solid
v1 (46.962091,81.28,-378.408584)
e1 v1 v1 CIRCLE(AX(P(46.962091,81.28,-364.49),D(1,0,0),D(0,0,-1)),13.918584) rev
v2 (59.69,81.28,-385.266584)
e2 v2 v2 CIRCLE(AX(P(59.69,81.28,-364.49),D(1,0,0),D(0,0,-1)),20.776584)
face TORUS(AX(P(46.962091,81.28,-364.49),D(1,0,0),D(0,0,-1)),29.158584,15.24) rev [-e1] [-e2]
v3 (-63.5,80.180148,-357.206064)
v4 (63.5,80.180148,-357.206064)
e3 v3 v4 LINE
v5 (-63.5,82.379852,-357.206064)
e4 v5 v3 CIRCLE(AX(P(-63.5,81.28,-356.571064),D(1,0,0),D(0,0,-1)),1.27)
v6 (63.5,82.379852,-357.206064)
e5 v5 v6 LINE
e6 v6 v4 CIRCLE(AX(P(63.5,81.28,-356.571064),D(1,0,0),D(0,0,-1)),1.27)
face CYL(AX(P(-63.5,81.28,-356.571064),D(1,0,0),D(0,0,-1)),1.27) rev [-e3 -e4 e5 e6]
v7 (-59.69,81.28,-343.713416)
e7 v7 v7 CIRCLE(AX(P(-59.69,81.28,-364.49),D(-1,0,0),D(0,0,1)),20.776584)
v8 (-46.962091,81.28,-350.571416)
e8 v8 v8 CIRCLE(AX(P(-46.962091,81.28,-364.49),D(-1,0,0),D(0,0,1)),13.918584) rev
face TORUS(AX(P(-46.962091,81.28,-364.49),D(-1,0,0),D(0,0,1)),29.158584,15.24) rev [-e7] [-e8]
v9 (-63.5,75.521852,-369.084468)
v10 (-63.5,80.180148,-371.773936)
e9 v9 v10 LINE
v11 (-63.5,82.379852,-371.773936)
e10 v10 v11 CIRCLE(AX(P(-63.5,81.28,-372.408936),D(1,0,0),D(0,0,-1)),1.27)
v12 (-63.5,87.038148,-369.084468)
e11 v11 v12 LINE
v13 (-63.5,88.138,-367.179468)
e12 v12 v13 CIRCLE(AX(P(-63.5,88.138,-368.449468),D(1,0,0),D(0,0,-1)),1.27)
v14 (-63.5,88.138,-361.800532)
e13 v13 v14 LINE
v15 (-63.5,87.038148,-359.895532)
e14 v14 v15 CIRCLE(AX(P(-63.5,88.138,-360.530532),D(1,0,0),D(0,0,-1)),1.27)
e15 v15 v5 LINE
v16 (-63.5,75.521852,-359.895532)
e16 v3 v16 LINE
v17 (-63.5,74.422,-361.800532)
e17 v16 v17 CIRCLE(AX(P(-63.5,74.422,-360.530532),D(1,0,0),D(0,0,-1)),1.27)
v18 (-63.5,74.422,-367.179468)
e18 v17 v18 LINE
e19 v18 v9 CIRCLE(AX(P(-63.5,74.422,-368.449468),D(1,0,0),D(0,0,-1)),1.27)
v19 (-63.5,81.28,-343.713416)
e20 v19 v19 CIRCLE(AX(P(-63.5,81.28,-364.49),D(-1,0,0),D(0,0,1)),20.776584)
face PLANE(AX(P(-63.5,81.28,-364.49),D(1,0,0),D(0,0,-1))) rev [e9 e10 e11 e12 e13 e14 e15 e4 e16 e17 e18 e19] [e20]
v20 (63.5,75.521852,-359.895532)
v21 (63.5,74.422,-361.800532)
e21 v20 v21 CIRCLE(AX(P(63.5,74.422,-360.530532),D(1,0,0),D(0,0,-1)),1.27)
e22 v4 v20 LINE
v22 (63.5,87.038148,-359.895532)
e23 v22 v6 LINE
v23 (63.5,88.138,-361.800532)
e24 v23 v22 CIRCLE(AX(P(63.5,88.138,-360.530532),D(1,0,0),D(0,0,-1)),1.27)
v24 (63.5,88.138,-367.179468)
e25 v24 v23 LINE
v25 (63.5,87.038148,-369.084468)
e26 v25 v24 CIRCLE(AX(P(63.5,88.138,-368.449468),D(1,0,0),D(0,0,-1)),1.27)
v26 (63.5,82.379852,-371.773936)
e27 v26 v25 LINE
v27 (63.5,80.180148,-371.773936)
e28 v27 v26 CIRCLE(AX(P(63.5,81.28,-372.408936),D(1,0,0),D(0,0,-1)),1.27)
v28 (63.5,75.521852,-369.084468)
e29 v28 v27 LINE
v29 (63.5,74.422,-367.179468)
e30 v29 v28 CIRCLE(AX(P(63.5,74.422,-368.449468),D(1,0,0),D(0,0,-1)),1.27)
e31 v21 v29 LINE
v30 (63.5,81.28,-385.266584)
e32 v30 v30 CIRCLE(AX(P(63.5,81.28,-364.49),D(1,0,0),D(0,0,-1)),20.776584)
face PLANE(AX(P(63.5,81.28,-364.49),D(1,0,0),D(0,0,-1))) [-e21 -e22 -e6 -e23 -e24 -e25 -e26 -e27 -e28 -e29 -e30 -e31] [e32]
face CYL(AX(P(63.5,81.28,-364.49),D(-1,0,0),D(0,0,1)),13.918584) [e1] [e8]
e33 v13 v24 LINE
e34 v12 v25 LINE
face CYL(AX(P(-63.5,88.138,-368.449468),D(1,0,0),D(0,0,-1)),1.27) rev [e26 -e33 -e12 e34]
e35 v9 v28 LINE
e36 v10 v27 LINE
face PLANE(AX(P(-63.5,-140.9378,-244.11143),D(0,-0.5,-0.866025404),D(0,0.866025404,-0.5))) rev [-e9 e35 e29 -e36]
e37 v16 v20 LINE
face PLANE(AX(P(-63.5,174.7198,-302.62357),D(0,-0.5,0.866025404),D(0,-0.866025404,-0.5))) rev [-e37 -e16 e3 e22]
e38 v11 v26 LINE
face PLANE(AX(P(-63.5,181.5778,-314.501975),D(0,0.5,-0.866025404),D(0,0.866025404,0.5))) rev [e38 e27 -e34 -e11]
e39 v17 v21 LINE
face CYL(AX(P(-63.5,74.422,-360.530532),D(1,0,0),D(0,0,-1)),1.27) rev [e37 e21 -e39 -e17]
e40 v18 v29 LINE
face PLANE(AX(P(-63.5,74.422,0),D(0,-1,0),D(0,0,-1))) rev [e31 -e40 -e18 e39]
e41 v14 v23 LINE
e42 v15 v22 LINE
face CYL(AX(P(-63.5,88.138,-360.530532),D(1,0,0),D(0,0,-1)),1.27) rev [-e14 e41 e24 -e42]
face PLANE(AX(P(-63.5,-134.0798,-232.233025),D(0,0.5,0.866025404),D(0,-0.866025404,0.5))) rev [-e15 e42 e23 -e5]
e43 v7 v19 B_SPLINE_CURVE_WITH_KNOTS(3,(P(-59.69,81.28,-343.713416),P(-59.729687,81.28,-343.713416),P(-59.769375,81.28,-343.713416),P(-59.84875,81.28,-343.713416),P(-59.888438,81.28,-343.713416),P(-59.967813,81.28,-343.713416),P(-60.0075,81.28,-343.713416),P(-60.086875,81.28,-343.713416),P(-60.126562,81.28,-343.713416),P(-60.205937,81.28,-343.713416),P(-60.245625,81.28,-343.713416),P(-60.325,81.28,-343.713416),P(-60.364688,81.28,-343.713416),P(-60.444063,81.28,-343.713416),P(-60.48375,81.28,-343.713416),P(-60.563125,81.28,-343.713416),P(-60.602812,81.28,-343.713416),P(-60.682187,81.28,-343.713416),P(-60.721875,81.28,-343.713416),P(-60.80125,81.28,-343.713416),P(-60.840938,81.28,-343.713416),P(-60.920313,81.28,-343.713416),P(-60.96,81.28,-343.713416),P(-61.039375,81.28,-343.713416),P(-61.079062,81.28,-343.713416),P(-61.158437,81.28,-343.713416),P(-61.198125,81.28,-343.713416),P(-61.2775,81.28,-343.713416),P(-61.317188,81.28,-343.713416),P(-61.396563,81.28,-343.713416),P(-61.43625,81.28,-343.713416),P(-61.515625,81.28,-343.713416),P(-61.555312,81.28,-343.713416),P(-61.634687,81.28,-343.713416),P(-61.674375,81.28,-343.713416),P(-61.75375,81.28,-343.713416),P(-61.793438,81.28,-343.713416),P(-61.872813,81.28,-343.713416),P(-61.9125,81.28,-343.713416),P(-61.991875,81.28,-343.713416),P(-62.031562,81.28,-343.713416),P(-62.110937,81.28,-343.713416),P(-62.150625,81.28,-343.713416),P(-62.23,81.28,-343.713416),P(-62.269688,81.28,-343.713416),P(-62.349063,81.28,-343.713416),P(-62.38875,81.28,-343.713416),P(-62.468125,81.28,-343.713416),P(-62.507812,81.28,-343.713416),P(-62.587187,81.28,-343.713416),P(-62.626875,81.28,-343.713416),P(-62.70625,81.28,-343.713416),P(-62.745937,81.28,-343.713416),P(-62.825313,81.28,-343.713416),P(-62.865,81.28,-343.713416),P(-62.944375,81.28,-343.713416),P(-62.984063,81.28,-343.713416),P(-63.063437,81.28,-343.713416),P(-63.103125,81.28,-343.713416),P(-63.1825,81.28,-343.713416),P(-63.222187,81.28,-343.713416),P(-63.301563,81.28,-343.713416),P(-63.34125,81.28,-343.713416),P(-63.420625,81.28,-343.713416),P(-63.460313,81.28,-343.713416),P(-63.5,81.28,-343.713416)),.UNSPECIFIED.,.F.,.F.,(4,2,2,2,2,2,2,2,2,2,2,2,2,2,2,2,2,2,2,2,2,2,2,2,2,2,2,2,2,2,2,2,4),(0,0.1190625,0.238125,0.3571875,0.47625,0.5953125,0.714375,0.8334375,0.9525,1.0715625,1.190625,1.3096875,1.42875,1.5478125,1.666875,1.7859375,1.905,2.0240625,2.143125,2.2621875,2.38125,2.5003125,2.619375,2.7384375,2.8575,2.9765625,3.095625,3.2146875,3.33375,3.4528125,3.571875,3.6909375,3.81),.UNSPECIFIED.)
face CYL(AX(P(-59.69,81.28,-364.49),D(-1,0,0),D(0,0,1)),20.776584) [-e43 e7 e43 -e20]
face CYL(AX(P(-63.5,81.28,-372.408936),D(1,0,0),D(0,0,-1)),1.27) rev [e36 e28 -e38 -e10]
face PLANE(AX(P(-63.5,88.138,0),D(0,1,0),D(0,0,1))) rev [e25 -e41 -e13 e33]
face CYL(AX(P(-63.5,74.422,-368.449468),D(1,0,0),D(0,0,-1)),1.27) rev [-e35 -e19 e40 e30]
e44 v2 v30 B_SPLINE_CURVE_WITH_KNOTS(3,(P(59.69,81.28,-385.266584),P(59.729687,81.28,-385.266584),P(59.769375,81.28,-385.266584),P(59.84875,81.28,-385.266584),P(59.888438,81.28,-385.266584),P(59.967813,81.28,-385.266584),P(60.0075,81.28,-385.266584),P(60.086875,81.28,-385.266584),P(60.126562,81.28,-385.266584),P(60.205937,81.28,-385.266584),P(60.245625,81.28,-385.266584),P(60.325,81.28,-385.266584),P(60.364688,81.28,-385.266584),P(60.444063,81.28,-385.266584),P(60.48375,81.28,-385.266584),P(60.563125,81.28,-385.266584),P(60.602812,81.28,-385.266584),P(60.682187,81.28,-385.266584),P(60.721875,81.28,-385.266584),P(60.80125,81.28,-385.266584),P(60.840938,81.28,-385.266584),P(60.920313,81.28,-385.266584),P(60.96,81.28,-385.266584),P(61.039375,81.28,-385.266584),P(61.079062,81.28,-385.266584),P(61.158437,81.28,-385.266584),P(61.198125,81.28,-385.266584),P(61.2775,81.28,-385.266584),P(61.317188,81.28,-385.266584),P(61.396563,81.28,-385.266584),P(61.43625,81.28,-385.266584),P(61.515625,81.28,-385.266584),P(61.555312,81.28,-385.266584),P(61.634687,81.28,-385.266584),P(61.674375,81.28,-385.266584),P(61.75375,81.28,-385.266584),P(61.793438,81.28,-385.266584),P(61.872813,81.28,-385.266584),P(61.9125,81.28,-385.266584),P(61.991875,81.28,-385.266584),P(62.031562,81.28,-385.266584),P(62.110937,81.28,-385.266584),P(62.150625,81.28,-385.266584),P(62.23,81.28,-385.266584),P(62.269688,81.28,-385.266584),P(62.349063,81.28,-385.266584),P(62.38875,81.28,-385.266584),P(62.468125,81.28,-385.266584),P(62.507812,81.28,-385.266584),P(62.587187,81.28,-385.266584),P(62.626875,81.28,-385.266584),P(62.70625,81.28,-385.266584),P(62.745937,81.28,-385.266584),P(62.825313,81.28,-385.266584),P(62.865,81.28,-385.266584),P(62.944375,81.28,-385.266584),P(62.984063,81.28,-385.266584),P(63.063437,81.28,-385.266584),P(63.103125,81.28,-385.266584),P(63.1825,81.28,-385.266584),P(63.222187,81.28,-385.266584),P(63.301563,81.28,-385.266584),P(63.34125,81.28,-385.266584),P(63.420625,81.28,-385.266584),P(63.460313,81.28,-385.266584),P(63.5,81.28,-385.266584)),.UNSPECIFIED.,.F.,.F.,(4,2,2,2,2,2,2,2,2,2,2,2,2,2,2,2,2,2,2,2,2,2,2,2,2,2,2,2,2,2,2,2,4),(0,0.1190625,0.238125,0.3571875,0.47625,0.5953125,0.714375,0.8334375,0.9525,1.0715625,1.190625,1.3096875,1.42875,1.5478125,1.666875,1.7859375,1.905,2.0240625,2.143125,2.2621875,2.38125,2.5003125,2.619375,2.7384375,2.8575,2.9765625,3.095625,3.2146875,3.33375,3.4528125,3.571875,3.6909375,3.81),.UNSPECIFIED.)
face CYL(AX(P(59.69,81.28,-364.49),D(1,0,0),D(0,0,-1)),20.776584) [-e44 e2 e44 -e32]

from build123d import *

# Parameters (mm, degrees)
SKETCH1_R           = 13.918584035
BOSS_EXTRUDE1_DEPTH = 63.5
BOSS_EXTRUDE2_START = -3.81
SKETCH3_R           = 20.776584035
SKETCH3_R_2         = 13.918584035
BOSS_EXTRUDE2_DEPTH = 3.81
FILLET1_R           = 15.24
SKETCH4_R           = 20.776584035
SKETCH4_R_2         = 13.918584035
BOSS_EXTRUDE3_DEPTH = 3.81
FILLET2_R           = 15.24
SKETCH7_R           = 1.27
CUT_EXTRUDE1_DEPTH  = 419.299996556


with BuildPart() as part:
    # Sketch1 → Boss-Extrude1 (new, symmetric)
    with BuildSketch(Plane(origin=(0, 0, 0), x_dir=(0, 0, -1), z_dir=(1, 0, 0))):
        with Locations((364.49, 81.28)):
            Circle(SKETCH1_R)
    extrude(amount=BOSS_EXTRUDE1_DEPTH, both=True)

    # Sketch3 → Boss-Extrude2 (add)
    with BuildSketch(Plane.ZY.offset(63.5).offset(BOSS_EXTRUDE2_START)):
        with Locations((-364.49, 81.28)):
            Circle(SKETCH3_R)
        with Locations((-364.49, 81.28)):
            Circle(SKETCH3_R_2, mode=Mode.SUBTRACT)
    extrude(amount=BOSS_EXTRUDE2_DEPTH)

    # Fillet1
    # the kernel refuses this fillet: 15.24 mm, written as the material it adds along each edge
    with BuildSketch(Plane(origin=(-59.69, 81.28, -364.49), x_dir=(0, 0, -1), z_dir=(0, -1, 0))) as fillet1_piece_1:
        with BuildLine():
            CenterArc((29.158584035, 12.727909333), FILLET1_R, 180, 56.632987031)
            Line((20.776584035, 0), (20.608944035, -0.254558187))
            ThreePointArc((20.608944035, -0.254558187), (17.347584035, -0.3048), (13.918584035, -0.3048))
            Line((13.918584035, -0.3048), (13.613784035, 0))
            Line((13.613784035, 0), (13.613784035, 12.727909333))
            Line((13.613784035, 12.727909333), (13.918584035, 12.727909333))
        make_face()
    revolve(axis=Axis((-59.69, 81.28, -364.49), (1, 0, 0)))

    # Sketch4 → Boss-Extrude3 (add)
    with BuildSketch(Plane(origin=(63.5, 0, 0), x_dir=(0, 0, -1), z_dir=(1, 0, 0))):
        with Locations(Location((364.49, 81.28, 0), (0, 0, 180))):
            Circle(SKETCH4_R)
        with Locations(Location((364.49, 81.28, 0), (0, 0, 180))):
            Circle(SKETCH4_R_2, mode=Mode.SUBTRACT)
    extrude(amount=-BOSS_EXTRUDE3_DEPTH)

    # Fillet2
    # the kernel refuses this fillet: 15.24 mm, written as the material it adds along each edge
    with BuildSketch(Plane(origin=(59.69, 81.28, -364.49), x_dir=(0, 0, -1), z_dir=(0, 1, 0))) as fillet2_piece_1:
        with BuildLine():
            CenterArc((29.158584035, 12.727909333), FILLET2_R, 180, 56.632987031)
            Line((20.776584035, 0), (20.608944035, -0.254558187))
            ThreePointArc((20.608944035, -0.254558187), (17.347584035, -0.3048), (13.918584035, -0.3048))
            Line((13.918584035, -0.3048), (13.613784035, 0))
            Line((13.613784035, 0), (13.613784035, 12.727909333))
            Line((13.613784035, 12.727909333), (13.918584035, 12.727909333))
        make_face()
    revolve(axis=Axis((59.69, 81.28, -364.49), (-1, 0, 0)))

    # Sketch7 → Cut-Extrude1 (cut, through all)
    with BuildSketch(Plane(origin=(63.5, 0, 0), x_dir=(0, 0, -1), z_dir=(1, 0, 0))):
        with Locations((372.408936292, 81.28)):
            Circle(SKETCH7_R)
        with Locations((368.449468146, 88.138)):
            Circle(SKETCH7_R)
        with Locations((360.530531854, 88.138)):
            Circle(SKETCH7_R)
        with Locations((356.571063708, 81.28)):
            Circle(SKETCH7_R)
        with Locations((360.530531854, 74.422)):
            Circle(SKETCH7_R)
        with Locations((368.449468146, 74.422)):
            Circle(SKETCH7_R)
        Polygon((372.408936292, 81.28), (368.449468146, 88.138), (360.530531854, 88.138), (356.571063708, 81.28), (360.530531854, 74.422), (368.449468146, 74.422), align=None)
        with BuildLine():
            ThreePointArc((359.895531854, 87.038147737), (361.165531854, 87.038147737), (361.800531854, 88.138))
            Line((361.800531854, 88.138), (360.530531854, 88.138))
            Line((360.530531854, 88.138), (359.895531854, 87.038147737))
        make_face()
        with BuildLine():
            Line((360.530531854, 88.138), (361.800531854, 88.138))
            ThreePointArc((361.800531854, 88.138), (359.895531854, 89.237852263), (359.895531854, 87.038147737))
            Line((359.895531854, 87.038147737), (360.530531854, 88.138))
        make_face()
        with BuildLine():
            ThreePointArc((357.841063708, 81.28), (357.670915971, 81.915), (357.206063708, 82.379852263))
            Line((357.206063708, 82.379852263), (356.571063708, 81.28))
            Line((356.571063708, 81.28), (357.206063708, 80.180147737))
            ThreePointArc((357.206063708, 80.180147737), (357.670915971, 80.645), (357.841063708, 81.28))
        make_face()
        with BuildLine():
            Line((356.571063708, 81.28), (357.206063708, 82.379852263))
            ThreePointArc((357.206063708, 82.379852263), (355.301063708, 81.28), (357.206063708, 80.180147737))
            Line((357.206063708, 80.180147737), (356.571063708, 81.28))
        make_face()
        with BuildLine():
            ThreePointArc((359.895531854, 75.521852263), (359.895531854, 73.322147737), (361.800531854, 74.422))
            Line((361.800531854, 74.422), (360.530531854, 74.422))
            Line((360.530531854, 74.422), (359.895531854, 75.521852263))
        make_face()
        with BuildLine():
            Line((360.530531854, 74.422), (361.800531854, 74.422))
            ThreePointArc((361.800531854, 74.422), (361.165531854, 75.521852263), (359.895531854, 75.521852263))
            Line((359.895531854, 75.521852263), (360.530531854, 74.422))
        make_face()
        with BuildLine():
            ThreePointArc((367.179468146, 88.138), (367.814468146, 87.038147737), (369.084468146, 87.038147737))
            Line((369.084468146, 87.038147737), (368.449468146, 88.138))
            Line((368.449468146, 88.138), (367.179468146, 88.138))
        make_face()
        with BuildLine():
            Line((368.449468146, 88.138), (369.084468146, 87.038147737))
            ThreePointArc((369.084468146, 87.038147737), (369.549320409, 87.503), (369.719468146, 88.138))
            ThreePointArc((369.719468146, 88.138), (368.449468146, 89.408), (367.179468146, 88.138))
            Line((367.179468146, 88.138), (368.449468146, 88.138))
        make_face()
        with BuildLine():
            Line((371.773936292, 80.180147737), (372.408936292, 81.28))
            Line((372.408936292, 81.28), (371.773936292, 82.379852263))
            ThreePointArc((371.773936292, 82.379852263), (371.138936292, 81.28), (371.773936292, 80.180147737))
        make_face()
        with BuildLine():
            Line((371.773936292, 82.379852263), (372.408936292, 81.28))
            Line((372.408936292, 81.28), (371.773936292, 80.180147737))
            ThreePointArc((371.773936292, 80.180147737), (373.043936292, 80.180147737), (373.678936292, 81.28))
            ThreePointArc((373.678936292, 81.28), (373.043936292, 82.379852263), (371.773936292, 82.379852263))
        make_face()
        with BuildLine():
            ThreePointArc((369.719468146, 74.422), (369.549320409, 75.057), (369.084468146, 75.521852263))
            Line((369.084468146, 75.521852263), (368.449468146, 74.422))
            Line((368.449468146, 74.422), (367.179468146, 74.422))
            ThreePointArc((367.179468146, 74.422), (368.449468146, 73.152), (369.719468146, 74.422))
        make_face()
        with BuildLine():
            Line((368.449468146, 74.422), (369.084468146, 75.521852263))
            ThreePointArc((369.084468146, 75.521852263), (367.814468146, 75.521852263), (367.179468146, 74.422))
            Line((367.179468146, 74.422), (368.449468146, 74.422))
        make_face()
    extrude(amount=-CUT_EXTRUDE1_DEPTH, mode=Mode.SUBTRACT)


solid = part.part
